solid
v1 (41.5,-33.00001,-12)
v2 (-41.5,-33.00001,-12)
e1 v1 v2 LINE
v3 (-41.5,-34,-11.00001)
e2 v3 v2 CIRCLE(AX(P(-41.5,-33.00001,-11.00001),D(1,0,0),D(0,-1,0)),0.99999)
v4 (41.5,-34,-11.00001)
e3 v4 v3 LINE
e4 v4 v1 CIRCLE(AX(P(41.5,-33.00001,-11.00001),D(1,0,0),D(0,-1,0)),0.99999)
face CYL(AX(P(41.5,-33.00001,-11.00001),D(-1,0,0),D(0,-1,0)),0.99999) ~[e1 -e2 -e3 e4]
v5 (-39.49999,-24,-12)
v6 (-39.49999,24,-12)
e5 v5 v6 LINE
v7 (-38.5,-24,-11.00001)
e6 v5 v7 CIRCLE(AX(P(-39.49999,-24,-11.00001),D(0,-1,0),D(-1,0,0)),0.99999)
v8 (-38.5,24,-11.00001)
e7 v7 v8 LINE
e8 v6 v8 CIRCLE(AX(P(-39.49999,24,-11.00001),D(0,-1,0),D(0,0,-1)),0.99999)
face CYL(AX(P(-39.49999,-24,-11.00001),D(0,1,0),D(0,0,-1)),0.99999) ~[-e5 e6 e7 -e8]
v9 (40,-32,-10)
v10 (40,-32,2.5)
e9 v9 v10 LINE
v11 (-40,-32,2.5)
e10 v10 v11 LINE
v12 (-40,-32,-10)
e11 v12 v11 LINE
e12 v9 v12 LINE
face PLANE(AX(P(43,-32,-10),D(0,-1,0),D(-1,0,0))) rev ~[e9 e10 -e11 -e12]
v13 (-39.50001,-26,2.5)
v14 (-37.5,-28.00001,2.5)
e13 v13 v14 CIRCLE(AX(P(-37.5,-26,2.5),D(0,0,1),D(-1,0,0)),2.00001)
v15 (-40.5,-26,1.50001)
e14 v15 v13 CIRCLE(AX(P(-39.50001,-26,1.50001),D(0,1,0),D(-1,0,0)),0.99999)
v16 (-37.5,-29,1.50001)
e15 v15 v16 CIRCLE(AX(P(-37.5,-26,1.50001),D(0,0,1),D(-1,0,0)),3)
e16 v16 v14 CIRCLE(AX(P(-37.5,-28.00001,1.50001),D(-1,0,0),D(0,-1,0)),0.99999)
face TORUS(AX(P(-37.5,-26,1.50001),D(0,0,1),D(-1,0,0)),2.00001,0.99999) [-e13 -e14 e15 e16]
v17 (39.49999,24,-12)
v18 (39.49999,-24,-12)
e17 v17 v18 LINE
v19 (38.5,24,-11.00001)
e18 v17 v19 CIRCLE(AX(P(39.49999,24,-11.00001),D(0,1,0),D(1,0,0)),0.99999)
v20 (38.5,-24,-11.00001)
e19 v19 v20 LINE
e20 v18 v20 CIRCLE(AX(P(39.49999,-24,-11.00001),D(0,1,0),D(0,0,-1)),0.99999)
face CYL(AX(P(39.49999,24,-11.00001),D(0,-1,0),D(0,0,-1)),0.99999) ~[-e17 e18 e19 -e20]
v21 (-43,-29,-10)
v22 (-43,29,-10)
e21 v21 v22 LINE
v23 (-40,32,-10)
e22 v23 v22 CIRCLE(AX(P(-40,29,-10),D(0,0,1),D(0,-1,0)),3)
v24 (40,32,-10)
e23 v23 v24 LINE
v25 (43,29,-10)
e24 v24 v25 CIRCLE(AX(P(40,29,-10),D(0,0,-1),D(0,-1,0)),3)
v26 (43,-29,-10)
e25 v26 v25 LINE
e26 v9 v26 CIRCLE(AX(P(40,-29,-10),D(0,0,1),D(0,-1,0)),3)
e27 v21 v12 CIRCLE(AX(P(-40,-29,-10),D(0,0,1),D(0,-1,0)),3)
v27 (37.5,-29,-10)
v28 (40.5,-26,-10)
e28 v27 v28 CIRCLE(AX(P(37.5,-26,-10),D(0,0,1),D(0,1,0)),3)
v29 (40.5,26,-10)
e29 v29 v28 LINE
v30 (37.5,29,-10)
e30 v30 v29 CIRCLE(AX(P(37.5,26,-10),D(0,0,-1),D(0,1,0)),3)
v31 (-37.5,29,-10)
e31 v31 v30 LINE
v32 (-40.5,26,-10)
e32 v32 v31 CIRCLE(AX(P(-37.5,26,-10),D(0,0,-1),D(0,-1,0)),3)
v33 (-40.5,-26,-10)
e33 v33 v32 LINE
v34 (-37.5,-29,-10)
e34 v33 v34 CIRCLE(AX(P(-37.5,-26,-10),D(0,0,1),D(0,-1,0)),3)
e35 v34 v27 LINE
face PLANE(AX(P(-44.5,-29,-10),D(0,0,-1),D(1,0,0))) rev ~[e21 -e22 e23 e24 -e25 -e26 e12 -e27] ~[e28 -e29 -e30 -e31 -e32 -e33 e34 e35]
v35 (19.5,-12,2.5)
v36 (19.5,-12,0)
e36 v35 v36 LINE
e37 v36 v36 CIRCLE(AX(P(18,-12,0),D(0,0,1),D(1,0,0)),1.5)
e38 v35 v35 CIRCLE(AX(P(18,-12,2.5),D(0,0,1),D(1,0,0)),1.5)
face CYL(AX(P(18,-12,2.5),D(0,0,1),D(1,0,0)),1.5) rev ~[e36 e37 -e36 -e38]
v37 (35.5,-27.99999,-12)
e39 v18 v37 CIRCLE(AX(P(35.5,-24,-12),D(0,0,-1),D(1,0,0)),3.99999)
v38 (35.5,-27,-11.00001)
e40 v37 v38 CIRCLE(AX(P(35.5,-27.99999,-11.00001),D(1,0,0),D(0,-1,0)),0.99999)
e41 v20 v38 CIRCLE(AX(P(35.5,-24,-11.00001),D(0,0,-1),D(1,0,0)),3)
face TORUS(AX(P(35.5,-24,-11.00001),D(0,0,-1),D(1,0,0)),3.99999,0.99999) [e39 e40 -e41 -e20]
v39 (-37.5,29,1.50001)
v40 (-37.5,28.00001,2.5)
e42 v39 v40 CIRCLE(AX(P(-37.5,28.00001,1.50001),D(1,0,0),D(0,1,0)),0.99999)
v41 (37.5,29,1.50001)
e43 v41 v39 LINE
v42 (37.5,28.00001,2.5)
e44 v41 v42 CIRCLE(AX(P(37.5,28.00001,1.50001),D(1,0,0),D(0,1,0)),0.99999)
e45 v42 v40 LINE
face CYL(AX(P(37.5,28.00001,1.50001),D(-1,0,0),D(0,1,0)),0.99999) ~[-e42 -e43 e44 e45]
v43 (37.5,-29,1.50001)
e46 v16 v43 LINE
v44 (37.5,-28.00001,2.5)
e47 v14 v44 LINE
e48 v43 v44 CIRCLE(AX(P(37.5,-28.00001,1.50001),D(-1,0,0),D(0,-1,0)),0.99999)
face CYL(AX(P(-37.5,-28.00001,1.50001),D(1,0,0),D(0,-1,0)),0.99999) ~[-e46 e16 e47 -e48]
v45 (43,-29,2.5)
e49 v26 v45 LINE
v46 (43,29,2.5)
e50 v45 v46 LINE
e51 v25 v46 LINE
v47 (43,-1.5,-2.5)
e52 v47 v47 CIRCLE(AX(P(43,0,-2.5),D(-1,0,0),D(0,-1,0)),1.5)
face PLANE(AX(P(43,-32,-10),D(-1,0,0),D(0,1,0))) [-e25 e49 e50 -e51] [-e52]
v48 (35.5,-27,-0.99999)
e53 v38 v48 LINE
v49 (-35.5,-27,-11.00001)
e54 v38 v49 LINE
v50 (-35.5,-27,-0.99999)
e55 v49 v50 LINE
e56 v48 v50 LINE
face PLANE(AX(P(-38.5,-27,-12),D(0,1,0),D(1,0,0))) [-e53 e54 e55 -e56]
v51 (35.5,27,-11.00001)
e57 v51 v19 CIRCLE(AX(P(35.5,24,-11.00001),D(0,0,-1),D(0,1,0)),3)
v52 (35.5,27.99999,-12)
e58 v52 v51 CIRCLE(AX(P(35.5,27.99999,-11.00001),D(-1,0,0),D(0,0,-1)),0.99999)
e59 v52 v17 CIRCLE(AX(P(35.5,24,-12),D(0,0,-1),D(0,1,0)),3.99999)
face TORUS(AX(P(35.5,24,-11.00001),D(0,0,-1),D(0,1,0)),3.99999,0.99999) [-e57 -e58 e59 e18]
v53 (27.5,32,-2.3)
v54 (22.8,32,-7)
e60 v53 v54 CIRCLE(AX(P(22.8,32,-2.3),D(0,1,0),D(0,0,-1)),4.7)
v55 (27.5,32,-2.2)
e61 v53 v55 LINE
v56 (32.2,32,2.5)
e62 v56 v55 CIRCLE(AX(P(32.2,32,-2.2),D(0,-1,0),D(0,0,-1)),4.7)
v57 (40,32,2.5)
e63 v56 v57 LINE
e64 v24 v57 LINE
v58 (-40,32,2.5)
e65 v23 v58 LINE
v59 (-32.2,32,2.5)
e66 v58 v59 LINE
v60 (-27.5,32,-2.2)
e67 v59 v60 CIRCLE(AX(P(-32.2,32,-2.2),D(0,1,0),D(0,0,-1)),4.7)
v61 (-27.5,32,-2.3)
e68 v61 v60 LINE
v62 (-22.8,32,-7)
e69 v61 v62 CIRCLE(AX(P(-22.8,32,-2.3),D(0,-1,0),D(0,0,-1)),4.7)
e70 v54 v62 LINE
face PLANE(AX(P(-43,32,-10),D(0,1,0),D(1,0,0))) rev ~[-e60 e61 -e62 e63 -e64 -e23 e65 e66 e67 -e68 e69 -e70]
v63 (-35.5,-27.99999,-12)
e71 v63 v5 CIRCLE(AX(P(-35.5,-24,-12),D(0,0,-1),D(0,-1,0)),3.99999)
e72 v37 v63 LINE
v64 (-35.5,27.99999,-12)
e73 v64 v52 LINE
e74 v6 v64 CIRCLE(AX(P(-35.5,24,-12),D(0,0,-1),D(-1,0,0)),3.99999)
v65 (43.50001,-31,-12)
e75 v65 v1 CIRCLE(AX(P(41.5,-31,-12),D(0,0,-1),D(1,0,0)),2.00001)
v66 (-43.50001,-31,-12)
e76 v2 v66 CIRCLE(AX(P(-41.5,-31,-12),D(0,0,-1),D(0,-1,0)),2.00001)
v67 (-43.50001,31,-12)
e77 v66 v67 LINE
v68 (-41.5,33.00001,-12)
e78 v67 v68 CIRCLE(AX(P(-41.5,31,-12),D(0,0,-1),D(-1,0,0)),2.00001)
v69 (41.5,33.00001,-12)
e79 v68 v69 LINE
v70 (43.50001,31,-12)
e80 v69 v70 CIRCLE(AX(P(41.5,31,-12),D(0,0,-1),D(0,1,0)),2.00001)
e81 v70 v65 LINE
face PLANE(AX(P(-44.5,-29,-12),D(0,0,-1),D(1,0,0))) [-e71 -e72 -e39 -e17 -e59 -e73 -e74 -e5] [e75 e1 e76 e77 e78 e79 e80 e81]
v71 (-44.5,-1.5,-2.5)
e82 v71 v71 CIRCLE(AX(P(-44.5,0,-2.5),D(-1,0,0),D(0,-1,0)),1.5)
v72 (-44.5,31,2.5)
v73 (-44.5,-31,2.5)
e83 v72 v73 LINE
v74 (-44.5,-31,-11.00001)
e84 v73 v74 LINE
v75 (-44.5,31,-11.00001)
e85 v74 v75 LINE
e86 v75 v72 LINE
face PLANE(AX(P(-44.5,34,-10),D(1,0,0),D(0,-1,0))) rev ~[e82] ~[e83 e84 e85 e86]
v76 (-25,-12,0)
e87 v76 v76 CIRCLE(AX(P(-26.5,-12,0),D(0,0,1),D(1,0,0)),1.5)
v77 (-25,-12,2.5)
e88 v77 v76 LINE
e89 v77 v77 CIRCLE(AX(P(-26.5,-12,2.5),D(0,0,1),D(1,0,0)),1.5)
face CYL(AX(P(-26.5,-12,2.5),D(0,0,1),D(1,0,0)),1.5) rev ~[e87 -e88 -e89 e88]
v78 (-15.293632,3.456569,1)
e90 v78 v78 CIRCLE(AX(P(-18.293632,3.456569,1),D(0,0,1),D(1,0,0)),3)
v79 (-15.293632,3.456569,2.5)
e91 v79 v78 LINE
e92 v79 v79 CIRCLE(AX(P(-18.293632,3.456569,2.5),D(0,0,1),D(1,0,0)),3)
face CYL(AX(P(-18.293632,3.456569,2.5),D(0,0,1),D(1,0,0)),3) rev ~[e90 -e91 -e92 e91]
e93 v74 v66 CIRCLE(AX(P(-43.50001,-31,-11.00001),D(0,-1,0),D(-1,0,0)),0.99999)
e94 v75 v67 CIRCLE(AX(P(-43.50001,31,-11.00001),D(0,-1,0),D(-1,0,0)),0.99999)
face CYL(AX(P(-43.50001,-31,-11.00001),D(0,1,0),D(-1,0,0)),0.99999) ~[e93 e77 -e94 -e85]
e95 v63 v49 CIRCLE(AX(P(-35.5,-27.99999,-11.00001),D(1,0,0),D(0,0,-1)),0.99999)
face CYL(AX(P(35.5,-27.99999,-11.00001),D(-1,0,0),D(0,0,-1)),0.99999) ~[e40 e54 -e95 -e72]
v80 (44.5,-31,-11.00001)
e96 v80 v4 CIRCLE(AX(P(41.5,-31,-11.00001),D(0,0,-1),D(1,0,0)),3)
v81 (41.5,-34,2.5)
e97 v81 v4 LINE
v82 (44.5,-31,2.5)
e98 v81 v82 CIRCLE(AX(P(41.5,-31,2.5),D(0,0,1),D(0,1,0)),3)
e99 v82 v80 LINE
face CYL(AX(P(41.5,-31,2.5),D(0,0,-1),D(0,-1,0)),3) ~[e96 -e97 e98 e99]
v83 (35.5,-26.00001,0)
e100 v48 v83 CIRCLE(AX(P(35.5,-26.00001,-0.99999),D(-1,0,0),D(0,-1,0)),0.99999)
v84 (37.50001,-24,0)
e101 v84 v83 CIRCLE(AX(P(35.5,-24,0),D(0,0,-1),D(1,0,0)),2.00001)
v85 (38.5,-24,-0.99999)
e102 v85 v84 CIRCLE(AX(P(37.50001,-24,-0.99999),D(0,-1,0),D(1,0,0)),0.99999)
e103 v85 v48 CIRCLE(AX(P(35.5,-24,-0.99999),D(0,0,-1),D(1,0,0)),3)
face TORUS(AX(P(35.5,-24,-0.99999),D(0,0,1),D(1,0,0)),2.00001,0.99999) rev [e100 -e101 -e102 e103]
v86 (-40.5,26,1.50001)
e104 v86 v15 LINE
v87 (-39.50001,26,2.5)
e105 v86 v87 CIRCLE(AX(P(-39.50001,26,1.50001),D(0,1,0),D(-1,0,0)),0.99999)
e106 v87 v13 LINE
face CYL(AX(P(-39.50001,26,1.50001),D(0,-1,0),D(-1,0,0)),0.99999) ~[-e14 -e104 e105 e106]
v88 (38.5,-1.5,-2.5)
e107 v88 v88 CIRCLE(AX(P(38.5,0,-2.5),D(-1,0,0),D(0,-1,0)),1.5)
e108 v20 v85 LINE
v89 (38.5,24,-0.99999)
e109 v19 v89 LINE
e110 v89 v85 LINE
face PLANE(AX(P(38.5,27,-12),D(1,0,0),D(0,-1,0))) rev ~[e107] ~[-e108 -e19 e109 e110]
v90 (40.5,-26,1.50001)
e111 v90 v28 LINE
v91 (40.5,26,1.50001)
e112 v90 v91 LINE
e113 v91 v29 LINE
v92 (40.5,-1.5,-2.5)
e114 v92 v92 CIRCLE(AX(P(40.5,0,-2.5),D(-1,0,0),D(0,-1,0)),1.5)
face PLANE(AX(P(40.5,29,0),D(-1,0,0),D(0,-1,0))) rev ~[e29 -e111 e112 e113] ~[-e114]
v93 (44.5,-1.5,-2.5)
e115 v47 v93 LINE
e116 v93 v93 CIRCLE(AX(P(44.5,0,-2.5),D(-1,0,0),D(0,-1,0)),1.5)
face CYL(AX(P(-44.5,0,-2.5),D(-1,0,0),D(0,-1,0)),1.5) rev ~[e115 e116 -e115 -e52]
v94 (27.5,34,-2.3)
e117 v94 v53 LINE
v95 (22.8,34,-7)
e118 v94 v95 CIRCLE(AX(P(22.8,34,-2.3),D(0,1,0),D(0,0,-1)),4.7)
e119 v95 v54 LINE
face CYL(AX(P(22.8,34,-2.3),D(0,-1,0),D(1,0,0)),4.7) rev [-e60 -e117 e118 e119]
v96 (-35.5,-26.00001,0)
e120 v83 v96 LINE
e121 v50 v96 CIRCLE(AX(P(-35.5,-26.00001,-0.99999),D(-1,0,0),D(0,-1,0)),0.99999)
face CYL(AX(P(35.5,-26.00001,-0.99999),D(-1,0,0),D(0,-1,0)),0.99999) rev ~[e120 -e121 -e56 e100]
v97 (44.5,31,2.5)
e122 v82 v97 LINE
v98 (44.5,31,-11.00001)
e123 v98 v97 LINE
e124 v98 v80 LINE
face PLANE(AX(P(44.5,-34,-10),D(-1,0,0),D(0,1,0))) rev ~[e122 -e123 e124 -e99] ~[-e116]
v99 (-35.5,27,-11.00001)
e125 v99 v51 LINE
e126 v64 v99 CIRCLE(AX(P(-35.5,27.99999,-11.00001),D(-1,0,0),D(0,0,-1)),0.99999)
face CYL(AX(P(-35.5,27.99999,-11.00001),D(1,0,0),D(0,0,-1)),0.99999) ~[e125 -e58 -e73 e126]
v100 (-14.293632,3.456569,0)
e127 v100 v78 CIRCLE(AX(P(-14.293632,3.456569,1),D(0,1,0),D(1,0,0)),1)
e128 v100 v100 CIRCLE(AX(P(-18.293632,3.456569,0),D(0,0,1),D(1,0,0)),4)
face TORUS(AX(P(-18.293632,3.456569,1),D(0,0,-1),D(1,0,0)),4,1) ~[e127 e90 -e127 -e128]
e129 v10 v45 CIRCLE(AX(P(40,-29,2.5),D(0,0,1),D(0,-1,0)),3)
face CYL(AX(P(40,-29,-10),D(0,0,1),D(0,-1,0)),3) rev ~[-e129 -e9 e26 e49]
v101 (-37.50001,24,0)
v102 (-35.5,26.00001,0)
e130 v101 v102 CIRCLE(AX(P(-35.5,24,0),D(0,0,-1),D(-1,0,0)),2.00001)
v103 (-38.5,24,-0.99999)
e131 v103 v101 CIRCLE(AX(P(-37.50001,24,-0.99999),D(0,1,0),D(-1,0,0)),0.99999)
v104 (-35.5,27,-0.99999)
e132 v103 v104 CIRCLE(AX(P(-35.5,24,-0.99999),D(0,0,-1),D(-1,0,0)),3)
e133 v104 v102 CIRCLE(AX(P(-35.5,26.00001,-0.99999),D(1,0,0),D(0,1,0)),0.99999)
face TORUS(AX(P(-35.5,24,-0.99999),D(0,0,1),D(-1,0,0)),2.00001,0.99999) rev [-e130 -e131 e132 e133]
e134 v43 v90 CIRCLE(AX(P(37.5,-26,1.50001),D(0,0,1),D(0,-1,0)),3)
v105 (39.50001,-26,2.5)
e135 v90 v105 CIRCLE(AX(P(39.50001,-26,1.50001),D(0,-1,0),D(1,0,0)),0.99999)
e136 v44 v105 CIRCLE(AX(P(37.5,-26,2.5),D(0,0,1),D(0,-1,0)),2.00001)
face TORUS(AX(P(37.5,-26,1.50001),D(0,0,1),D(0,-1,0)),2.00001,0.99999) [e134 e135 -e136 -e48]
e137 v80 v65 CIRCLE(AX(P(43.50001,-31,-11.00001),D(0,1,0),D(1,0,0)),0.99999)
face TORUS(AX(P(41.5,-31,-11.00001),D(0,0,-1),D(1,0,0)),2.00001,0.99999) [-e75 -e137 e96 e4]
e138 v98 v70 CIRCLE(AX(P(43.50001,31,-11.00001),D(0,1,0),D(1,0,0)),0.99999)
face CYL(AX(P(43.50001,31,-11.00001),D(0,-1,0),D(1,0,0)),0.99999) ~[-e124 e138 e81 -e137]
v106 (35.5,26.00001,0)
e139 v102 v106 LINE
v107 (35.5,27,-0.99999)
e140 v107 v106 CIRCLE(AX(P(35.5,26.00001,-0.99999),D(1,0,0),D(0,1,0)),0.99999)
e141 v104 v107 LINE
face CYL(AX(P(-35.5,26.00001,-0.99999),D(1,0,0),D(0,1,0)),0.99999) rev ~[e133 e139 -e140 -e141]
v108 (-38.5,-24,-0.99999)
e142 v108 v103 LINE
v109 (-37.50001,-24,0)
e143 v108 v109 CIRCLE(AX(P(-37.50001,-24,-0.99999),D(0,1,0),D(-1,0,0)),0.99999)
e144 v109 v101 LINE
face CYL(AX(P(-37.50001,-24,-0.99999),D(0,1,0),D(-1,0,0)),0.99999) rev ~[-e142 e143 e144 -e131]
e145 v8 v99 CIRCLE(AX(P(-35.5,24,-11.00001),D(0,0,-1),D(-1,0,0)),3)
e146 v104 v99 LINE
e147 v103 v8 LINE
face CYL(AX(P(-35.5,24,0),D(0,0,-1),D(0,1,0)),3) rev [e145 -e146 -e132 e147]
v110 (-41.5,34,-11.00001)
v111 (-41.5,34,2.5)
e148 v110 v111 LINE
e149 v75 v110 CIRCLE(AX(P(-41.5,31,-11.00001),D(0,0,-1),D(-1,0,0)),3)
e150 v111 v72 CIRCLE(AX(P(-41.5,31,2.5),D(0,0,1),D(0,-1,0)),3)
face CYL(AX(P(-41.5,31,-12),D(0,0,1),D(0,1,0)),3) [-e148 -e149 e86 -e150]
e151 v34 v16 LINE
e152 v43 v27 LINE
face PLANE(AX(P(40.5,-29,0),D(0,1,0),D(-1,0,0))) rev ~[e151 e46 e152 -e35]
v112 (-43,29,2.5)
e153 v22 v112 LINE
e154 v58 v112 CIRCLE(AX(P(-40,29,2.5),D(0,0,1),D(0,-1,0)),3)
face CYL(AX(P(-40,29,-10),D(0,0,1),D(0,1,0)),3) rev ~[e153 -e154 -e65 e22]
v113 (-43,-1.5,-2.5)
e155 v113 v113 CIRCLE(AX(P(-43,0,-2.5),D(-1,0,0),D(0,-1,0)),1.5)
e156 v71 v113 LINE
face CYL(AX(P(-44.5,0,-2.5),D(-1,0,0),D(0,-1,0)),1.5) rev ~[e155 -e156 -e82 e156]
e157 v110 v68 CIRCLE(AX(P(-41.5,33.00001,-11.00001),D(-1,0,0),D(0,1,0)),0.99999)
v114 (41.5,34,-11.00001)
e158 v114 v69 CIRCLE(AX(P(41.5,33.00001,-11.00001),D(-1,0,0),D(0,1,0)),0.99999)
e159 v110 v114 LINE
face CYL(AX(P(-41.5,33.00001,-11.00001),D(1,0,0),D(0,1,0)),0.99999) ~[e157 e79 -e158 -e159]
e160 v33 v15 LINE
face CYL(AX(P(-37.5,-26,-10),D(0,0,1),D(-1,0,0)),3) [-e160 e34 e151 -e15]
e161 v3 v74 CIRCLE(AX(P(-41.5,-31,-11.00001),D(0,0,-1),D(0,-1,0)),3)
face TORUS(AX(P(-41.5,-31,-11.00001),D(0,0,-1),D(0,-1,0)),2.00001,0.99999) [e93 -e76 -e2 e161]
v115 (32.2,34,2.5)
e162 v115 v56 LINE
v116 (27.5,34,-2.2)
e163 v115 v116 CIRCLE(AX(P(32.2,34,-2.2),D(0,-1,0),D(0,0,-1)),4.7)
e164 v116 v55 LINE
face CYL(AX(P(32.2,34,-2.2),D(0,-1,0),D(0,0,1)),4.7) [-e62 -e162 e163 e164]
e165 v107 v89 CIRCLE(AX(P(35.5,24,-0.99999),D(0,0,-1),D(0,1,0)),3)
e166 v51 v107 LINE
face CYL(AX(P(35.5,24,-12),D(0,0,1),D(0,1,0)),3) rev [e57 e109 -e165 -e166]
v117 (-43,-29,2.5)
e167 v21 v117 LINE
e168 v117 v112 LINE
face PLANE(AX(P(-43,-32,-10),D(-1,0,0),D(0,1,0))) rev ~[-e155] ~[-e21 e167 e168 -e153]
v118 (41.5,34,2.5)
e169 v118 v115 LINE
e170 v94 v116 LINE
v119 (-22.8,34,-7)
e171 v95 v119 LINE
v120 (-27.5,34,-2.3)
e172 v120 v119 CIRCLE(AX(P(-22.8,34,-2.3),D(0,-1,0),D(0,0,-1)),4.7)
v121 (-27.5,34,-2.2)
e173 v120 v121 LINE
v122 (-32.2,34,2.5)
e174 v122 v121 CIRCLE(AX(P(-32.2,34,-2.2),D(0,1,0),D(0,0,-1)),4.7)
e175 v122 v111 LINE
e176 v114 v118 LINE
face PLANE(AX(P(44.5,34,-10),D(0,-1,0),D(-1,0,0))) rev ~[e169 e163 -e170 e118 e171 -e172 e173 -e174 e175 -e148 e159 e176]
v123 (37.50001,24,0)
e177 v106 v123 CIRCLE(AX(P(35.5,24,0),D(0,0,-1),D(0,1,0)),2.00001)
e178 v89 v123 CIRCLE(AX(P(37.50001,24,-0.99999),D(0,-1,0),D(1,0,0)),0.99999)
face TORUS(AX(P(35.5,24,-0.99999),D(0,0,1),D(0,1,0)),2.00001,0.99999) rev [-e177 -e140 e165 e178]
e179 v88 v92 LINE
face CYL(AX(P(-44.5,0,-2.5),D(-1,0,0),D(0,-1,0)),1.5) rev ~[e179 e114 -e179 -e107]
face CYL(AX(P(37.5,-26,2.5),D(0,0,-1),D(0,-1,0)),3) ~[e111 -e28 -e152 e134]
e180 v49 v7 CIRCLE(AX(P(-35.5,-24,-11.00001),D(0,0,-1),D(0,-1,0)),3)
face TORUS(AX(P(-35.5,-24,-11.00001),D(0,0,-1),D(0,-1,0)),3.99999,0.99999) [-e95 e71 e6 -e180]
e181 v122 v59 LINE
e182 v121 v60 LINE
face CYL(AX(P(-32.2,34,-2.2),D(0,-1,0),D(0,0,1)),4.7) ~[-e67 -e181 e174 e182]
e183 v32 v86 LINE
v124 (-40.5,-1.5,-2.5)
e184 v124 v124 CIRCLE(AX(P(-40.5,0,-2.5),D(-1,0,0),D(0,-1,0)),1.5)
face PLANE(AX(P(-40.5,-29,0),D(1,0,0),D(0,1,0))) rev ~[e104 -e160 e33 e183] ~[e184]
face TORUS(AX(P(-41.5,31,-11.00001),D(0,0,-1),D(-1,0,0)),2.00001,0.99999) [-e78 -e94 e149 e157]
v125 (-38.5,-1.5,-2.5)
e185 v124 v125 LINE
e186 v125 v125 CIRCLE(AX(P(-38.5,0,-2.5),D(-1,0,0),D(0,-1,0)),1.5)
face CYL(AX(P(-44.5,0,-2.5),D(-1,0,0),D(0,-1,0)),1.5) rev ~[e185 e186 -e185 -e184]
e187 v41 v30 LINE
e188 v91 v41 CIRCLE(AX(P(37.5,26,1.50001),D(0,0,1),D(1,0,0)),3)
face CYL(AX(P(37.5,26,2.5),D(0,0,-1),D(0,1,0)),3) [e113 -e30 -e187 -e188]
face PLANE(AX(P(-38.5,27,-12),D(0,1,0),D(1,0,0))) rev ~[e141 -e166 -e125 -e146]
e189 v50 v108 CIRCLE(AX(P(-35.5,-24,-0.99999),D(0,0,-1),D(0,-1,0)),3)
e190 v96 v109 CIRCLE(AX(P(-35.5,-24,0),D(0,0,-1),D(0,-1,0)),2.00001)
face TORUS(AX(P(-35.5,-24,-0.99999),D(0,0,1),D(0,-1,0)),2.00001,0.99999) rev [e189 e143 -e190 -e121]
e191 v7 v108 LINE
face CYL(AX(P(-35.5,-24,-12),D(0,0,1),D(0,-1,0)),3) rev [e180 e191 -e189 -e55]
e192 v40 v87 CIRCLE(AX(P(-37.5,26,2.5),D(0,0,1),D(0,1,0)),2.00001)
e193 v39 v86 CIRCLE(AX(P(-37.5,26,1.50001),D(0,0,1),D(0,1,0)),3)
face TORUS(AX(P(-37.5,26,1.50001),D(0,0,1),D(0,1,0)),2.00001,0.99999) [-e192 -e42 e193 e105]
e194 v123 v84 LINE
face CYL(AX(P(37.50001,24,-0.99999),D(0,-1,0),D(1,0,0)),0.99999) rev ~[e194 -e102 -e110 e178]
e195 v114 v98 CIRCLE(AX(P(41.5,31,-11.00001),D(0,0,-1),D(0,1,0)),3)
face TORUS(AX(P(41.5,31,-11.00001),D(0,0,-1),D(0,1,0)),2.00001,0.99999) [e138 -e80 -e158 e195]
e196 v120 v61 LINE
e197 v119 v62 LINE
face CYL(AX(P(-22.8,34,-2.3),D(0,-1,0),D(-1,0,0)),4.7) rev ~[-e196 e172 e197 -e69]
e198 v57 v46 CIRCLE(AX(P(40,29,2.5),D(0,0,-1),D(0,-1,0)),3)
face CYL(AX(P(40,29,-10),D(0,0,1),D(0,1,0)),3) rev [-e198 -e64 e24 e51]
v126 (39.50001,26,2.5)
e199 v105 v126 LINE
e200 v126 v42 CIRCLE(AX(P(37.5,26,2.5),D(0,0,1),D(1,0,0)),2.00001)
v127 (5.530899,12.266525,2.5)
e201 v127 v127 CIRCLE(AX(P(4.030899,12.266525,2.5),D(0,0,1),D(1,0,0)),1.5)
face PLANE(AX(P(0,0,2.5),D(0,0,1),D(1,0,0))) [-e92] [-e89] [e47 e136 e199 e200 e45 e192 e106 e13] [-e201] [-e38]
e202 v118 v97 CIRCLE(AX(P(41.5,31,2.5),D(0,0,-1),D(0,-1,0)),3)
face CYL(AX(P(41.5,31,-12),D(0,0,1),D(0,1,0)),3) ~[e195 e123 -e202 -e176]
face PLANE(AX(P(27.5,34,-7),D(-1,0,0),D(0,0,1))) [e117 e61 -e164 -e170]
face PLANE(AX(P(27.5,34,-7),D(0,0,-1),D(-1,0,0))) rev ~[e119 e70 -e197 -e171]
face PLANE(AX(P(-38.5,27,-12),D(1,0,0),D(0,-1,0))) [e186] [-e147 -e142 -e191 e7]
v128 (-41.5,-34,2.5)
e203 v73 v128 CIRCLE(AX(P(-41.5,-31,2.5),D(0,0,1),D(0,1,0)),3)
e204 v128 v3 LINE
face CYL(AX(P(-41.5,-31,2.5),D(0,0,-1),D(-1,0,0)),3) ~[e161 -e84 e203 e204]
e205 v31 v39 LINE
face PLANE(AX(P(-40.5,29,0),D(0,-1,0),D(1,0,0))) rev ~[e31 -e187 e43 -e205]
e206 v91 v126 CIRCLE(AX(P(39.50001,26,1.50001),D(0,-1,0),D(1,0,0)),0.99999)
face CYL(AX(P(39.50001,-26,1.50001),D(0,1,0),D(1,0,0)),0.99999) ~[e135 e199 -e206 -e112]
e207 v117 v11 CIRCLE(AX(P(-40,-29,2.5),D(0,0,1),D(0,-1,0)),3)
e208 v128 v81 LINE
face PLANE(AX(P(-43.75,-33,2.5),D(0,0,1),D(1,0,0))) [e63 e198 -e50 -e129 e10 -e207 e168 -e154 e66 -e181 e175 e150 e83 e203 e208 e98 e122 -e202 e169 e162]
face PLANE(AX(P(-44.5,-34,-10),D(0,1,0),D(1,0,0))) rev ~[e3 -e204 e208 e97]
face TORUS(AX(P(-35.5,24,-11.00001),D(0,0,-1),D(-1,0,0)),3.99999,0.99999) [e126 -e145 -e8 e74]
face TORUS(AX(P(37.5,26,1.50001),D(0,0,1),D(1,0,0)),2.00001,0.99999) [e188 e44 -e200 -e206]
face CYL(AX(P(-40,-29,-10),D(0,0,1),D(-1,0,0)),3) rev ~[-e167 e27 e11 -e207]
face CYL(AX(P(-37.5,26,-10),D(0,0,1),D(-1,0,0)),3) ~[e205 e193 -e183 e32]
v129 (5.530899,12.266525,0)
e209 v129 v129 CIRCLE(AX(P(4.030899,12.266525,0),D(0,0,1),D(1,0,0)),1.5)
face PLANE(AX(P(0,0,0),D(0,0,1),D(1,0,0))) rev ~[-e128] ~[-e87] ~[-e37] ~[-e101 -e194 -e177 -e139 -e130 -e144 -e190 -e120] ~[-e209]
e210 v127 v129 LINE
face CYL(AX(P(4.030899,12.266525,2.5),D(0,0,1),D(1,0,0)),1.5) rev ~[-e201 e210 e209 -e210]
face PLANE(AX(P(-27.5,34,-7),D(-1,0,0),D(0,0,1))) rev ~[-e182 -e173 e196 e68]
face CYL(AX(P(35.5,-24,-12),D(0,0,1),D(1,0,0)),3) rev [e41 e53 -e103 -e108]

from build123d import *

# Parameters (mm, degrees)
F0_W          = 81
F0_H          = 58
F1_DEPTH      = 2.5
F2_R          = 1.5
F2_R_2        = 3
F3_DEPTH      = 25
F4_W          = 2
F4_H          = 2
F4_W_2        = 77
F4_H_2        = 54
F5_DEPTH      = 12
F6_W          = 89
F6_H          = 2
F7_DEPTH      = 5
F7_DEPTH_BACK = 63
F8_W          = 77
F8_H          = 54
F9_DEPTH      = 2
F10_W         = 1.5
F10_H         = 2
F10_W_2       = 86
F10_H_2       = 64
F11_DEPTH     = 12.5
F12_W         = 55
F12_H         = 14
F13_DEPTH     = 2
F14_R         = 4.7
F15_R         = 3
F16_R         = 1.5
F17_DEPTH     = 89.001
F18_R         = 3
F19_R         = 0.99999
F20_R         = 1


# Not quite as in the source:
# - a fillet or chamfer is up to 0.001 mm smaller than in the source, because OpenCascade refuses the exact size


with BuildPart() as f1:
    # F0 (on Top) → F1 (new body)
    with BuildSketch(Plane.XY):
        Rectangle(F0_W, F0_H)
    extrude(amount=F1_DEPTH)

    # F2 (on face) → F3 (cut)
    with BuildSketch(Plane.XY.offset(2.5)):
        with Locations((-26.5, -12)):
            Circle(F2_R)
        with Locations((18, -12)):
            Circle(F2_R)
        with Locations((4.0308988764, 12.2665245513)):
            Circle(F2_R)
        with Locations((-18.2936321066, 3.4565690241)):
            Circle(F2_R_2)
    extrude(amount=-F3_DEPTH, mode=Mode.SUBTRACT)

    # F4 (on face) → F5 (join)
    with BuildSketch(Plane(origin=(0, 0, 0), x_dir=(1, 0, 0), z_dir=(0, 0, -1))):
        with Locations((-39.5, 28)):
            Rectangle(F4_W, F4_H)
        with Locations((0, 28)):
            Rectangle(F4_W_2, F4_H)
        with Locations((-39.5, 0)):
            Rectangle(F4_W, F4_H_2)
        with Locations((39.5, 28)):
            Rectangle(F4_W, F4_H)
        with Locations((-39.5, -28)):
            Rectangle(F4_W, F4_H)
        with Locations((39.5, 0)):
            Rectangle(F4_W, F4_H_2)
        with Locations((0, -28)):
            Rectangle(F4_W_2, F4_H)
        with Locations((39.5, -28)):
            Rectangle(F4_W, F4_H)
    extrude(amount=F5_DEPTH)

    # F6 (on face) → F7 (join, two sides)
    with BuildSketch(Plane.XZ.offset(29)) as f7_sk:
        with Locations((0, -11)):
            Rectangle(F6_W, F6_H)
    extrude(amount=F7_DEPTH)
    extrude(f7_sk.sketch, amount=-F7_DEPTH_BACK)

    # F8 (on face) → F9 (cut, through all)
    with BuildSketch(Plane(origin=(0, 0, -12), x_dir=(1, 0, 0), z_dir=(0, 0, -1))):
        Rectangle(F8_W, F8_H)
    extrude(amount=-F9_DEPTH, mode=Mode.SUBTRACT)

    # F10 (on face) → F11 (join)
    with BuildSketch(Plane.XY.offset(-10)):
        with Locations((-43.75, -33)):
            Rectangle(F10_W, F10_H)
        with Locations((0, -33)):
            Rectangle(F10_W_2, F10_H)
        with Locations((-43.75, 0)):
            Rectangle(F10_W, F10_H_2)
        with Locations((43.75, -33)):
            Rectangle(F10_W, F10_H)
        with Locations((-43.75, 33)):
            Rectangle(F10_W, F10_H)
        with Locations((43.75, 0)):
            Rectangle(F10_W, F10_H_2)
        with Locations((0, 33)):
            Rectangle(F10_W_2, F10_H)
        with Locations((43.75, 33)):
            Rectangle(F10_W, F10_H)
    extrude(amount=F11_DEPTH)

    # F12 (on face) → F13 (cut)
    with BuildSketch(Plane(origin=(0, 34, 0), x_dir=(-1, 0, 0), z_dir=(0, 1, 0))):
        Rectangle(F12_W, F12_H)
    extrude(amount=-F13_DEPTH, mode=Mode.SUBTRACT)

    # F14
    f14_edges = [f1.edges().sort_by_distance(p)[0] for p in [
        (27.5, 33, -7),
        (-27.5, 33, -7),
        (27.5, 33, 2.5),
        (-27.5, 33, 2.5),
    ]]
    fillet(f14_edges, radius=F14_R)

    # F15
    f15_edges = [f1.edges().sort_by_distance(p)[0] for p in [
        (40.5, -29, -3.75),
        (-40.5, -29, -3.75),
        (40.5, 29, -3.75),
        (-40.5, 29, -3.75),
        (38.5, 27, -6),
        (-38.5, 27, -6),
        (-38.5, -27, -6),
        (38.5, -27, -6),
        (44.5, 34, -4.75),
        (-44.5, -34, -4.75),
        (44.5, -34, -4.75),
        (-44.5, 34, -4.75),
    ]]
    fillet(f15_edges, radius=F15_R)

    # F16 (on face) → F17 (cut, through all)
    with BuildSketch(Plane(origin=(-44.5, 0, 0), x_dir=(0, -1, 0), z_dir=(-1, 0, 0))):
        with Locations((0, -2.5)):
            Circle(F16_R)
    extrude(amount=-F17_DEPTH, mode=Mode.SUBTRACT)

    # F18
    f18_edges = [f1.edges().sort_by_distance(p)[0] for p in [
        (43, -32, -3.75),
        (-43, -32, -3.75),
        (43, 32, -3.75),
        (-43, 32, -3.75),
    ]]
    fillet(f18_edges, radius=F18_R)

    # F19 (radius 1 in the source; OpenCascade refuses exactly that, so slightly less here)
    f19_edges = [f1.edges().sort_by_distance(p)[0] for p in [
        (0, -29, 2.5),
        (0, 27, 0),
        (0, 27, -12),
        (0, 34, -12),
    ]]
    fillet(f19_edges, radius=F19_R)

    # F20
    f20_edges = [f1.edges().sort_by_distance(p)[0] for p in [
        (-21.293632, 3.456569, 0),
    ]]
    fillet(f20_edges, radius=F20_R)


solid = f1.part
